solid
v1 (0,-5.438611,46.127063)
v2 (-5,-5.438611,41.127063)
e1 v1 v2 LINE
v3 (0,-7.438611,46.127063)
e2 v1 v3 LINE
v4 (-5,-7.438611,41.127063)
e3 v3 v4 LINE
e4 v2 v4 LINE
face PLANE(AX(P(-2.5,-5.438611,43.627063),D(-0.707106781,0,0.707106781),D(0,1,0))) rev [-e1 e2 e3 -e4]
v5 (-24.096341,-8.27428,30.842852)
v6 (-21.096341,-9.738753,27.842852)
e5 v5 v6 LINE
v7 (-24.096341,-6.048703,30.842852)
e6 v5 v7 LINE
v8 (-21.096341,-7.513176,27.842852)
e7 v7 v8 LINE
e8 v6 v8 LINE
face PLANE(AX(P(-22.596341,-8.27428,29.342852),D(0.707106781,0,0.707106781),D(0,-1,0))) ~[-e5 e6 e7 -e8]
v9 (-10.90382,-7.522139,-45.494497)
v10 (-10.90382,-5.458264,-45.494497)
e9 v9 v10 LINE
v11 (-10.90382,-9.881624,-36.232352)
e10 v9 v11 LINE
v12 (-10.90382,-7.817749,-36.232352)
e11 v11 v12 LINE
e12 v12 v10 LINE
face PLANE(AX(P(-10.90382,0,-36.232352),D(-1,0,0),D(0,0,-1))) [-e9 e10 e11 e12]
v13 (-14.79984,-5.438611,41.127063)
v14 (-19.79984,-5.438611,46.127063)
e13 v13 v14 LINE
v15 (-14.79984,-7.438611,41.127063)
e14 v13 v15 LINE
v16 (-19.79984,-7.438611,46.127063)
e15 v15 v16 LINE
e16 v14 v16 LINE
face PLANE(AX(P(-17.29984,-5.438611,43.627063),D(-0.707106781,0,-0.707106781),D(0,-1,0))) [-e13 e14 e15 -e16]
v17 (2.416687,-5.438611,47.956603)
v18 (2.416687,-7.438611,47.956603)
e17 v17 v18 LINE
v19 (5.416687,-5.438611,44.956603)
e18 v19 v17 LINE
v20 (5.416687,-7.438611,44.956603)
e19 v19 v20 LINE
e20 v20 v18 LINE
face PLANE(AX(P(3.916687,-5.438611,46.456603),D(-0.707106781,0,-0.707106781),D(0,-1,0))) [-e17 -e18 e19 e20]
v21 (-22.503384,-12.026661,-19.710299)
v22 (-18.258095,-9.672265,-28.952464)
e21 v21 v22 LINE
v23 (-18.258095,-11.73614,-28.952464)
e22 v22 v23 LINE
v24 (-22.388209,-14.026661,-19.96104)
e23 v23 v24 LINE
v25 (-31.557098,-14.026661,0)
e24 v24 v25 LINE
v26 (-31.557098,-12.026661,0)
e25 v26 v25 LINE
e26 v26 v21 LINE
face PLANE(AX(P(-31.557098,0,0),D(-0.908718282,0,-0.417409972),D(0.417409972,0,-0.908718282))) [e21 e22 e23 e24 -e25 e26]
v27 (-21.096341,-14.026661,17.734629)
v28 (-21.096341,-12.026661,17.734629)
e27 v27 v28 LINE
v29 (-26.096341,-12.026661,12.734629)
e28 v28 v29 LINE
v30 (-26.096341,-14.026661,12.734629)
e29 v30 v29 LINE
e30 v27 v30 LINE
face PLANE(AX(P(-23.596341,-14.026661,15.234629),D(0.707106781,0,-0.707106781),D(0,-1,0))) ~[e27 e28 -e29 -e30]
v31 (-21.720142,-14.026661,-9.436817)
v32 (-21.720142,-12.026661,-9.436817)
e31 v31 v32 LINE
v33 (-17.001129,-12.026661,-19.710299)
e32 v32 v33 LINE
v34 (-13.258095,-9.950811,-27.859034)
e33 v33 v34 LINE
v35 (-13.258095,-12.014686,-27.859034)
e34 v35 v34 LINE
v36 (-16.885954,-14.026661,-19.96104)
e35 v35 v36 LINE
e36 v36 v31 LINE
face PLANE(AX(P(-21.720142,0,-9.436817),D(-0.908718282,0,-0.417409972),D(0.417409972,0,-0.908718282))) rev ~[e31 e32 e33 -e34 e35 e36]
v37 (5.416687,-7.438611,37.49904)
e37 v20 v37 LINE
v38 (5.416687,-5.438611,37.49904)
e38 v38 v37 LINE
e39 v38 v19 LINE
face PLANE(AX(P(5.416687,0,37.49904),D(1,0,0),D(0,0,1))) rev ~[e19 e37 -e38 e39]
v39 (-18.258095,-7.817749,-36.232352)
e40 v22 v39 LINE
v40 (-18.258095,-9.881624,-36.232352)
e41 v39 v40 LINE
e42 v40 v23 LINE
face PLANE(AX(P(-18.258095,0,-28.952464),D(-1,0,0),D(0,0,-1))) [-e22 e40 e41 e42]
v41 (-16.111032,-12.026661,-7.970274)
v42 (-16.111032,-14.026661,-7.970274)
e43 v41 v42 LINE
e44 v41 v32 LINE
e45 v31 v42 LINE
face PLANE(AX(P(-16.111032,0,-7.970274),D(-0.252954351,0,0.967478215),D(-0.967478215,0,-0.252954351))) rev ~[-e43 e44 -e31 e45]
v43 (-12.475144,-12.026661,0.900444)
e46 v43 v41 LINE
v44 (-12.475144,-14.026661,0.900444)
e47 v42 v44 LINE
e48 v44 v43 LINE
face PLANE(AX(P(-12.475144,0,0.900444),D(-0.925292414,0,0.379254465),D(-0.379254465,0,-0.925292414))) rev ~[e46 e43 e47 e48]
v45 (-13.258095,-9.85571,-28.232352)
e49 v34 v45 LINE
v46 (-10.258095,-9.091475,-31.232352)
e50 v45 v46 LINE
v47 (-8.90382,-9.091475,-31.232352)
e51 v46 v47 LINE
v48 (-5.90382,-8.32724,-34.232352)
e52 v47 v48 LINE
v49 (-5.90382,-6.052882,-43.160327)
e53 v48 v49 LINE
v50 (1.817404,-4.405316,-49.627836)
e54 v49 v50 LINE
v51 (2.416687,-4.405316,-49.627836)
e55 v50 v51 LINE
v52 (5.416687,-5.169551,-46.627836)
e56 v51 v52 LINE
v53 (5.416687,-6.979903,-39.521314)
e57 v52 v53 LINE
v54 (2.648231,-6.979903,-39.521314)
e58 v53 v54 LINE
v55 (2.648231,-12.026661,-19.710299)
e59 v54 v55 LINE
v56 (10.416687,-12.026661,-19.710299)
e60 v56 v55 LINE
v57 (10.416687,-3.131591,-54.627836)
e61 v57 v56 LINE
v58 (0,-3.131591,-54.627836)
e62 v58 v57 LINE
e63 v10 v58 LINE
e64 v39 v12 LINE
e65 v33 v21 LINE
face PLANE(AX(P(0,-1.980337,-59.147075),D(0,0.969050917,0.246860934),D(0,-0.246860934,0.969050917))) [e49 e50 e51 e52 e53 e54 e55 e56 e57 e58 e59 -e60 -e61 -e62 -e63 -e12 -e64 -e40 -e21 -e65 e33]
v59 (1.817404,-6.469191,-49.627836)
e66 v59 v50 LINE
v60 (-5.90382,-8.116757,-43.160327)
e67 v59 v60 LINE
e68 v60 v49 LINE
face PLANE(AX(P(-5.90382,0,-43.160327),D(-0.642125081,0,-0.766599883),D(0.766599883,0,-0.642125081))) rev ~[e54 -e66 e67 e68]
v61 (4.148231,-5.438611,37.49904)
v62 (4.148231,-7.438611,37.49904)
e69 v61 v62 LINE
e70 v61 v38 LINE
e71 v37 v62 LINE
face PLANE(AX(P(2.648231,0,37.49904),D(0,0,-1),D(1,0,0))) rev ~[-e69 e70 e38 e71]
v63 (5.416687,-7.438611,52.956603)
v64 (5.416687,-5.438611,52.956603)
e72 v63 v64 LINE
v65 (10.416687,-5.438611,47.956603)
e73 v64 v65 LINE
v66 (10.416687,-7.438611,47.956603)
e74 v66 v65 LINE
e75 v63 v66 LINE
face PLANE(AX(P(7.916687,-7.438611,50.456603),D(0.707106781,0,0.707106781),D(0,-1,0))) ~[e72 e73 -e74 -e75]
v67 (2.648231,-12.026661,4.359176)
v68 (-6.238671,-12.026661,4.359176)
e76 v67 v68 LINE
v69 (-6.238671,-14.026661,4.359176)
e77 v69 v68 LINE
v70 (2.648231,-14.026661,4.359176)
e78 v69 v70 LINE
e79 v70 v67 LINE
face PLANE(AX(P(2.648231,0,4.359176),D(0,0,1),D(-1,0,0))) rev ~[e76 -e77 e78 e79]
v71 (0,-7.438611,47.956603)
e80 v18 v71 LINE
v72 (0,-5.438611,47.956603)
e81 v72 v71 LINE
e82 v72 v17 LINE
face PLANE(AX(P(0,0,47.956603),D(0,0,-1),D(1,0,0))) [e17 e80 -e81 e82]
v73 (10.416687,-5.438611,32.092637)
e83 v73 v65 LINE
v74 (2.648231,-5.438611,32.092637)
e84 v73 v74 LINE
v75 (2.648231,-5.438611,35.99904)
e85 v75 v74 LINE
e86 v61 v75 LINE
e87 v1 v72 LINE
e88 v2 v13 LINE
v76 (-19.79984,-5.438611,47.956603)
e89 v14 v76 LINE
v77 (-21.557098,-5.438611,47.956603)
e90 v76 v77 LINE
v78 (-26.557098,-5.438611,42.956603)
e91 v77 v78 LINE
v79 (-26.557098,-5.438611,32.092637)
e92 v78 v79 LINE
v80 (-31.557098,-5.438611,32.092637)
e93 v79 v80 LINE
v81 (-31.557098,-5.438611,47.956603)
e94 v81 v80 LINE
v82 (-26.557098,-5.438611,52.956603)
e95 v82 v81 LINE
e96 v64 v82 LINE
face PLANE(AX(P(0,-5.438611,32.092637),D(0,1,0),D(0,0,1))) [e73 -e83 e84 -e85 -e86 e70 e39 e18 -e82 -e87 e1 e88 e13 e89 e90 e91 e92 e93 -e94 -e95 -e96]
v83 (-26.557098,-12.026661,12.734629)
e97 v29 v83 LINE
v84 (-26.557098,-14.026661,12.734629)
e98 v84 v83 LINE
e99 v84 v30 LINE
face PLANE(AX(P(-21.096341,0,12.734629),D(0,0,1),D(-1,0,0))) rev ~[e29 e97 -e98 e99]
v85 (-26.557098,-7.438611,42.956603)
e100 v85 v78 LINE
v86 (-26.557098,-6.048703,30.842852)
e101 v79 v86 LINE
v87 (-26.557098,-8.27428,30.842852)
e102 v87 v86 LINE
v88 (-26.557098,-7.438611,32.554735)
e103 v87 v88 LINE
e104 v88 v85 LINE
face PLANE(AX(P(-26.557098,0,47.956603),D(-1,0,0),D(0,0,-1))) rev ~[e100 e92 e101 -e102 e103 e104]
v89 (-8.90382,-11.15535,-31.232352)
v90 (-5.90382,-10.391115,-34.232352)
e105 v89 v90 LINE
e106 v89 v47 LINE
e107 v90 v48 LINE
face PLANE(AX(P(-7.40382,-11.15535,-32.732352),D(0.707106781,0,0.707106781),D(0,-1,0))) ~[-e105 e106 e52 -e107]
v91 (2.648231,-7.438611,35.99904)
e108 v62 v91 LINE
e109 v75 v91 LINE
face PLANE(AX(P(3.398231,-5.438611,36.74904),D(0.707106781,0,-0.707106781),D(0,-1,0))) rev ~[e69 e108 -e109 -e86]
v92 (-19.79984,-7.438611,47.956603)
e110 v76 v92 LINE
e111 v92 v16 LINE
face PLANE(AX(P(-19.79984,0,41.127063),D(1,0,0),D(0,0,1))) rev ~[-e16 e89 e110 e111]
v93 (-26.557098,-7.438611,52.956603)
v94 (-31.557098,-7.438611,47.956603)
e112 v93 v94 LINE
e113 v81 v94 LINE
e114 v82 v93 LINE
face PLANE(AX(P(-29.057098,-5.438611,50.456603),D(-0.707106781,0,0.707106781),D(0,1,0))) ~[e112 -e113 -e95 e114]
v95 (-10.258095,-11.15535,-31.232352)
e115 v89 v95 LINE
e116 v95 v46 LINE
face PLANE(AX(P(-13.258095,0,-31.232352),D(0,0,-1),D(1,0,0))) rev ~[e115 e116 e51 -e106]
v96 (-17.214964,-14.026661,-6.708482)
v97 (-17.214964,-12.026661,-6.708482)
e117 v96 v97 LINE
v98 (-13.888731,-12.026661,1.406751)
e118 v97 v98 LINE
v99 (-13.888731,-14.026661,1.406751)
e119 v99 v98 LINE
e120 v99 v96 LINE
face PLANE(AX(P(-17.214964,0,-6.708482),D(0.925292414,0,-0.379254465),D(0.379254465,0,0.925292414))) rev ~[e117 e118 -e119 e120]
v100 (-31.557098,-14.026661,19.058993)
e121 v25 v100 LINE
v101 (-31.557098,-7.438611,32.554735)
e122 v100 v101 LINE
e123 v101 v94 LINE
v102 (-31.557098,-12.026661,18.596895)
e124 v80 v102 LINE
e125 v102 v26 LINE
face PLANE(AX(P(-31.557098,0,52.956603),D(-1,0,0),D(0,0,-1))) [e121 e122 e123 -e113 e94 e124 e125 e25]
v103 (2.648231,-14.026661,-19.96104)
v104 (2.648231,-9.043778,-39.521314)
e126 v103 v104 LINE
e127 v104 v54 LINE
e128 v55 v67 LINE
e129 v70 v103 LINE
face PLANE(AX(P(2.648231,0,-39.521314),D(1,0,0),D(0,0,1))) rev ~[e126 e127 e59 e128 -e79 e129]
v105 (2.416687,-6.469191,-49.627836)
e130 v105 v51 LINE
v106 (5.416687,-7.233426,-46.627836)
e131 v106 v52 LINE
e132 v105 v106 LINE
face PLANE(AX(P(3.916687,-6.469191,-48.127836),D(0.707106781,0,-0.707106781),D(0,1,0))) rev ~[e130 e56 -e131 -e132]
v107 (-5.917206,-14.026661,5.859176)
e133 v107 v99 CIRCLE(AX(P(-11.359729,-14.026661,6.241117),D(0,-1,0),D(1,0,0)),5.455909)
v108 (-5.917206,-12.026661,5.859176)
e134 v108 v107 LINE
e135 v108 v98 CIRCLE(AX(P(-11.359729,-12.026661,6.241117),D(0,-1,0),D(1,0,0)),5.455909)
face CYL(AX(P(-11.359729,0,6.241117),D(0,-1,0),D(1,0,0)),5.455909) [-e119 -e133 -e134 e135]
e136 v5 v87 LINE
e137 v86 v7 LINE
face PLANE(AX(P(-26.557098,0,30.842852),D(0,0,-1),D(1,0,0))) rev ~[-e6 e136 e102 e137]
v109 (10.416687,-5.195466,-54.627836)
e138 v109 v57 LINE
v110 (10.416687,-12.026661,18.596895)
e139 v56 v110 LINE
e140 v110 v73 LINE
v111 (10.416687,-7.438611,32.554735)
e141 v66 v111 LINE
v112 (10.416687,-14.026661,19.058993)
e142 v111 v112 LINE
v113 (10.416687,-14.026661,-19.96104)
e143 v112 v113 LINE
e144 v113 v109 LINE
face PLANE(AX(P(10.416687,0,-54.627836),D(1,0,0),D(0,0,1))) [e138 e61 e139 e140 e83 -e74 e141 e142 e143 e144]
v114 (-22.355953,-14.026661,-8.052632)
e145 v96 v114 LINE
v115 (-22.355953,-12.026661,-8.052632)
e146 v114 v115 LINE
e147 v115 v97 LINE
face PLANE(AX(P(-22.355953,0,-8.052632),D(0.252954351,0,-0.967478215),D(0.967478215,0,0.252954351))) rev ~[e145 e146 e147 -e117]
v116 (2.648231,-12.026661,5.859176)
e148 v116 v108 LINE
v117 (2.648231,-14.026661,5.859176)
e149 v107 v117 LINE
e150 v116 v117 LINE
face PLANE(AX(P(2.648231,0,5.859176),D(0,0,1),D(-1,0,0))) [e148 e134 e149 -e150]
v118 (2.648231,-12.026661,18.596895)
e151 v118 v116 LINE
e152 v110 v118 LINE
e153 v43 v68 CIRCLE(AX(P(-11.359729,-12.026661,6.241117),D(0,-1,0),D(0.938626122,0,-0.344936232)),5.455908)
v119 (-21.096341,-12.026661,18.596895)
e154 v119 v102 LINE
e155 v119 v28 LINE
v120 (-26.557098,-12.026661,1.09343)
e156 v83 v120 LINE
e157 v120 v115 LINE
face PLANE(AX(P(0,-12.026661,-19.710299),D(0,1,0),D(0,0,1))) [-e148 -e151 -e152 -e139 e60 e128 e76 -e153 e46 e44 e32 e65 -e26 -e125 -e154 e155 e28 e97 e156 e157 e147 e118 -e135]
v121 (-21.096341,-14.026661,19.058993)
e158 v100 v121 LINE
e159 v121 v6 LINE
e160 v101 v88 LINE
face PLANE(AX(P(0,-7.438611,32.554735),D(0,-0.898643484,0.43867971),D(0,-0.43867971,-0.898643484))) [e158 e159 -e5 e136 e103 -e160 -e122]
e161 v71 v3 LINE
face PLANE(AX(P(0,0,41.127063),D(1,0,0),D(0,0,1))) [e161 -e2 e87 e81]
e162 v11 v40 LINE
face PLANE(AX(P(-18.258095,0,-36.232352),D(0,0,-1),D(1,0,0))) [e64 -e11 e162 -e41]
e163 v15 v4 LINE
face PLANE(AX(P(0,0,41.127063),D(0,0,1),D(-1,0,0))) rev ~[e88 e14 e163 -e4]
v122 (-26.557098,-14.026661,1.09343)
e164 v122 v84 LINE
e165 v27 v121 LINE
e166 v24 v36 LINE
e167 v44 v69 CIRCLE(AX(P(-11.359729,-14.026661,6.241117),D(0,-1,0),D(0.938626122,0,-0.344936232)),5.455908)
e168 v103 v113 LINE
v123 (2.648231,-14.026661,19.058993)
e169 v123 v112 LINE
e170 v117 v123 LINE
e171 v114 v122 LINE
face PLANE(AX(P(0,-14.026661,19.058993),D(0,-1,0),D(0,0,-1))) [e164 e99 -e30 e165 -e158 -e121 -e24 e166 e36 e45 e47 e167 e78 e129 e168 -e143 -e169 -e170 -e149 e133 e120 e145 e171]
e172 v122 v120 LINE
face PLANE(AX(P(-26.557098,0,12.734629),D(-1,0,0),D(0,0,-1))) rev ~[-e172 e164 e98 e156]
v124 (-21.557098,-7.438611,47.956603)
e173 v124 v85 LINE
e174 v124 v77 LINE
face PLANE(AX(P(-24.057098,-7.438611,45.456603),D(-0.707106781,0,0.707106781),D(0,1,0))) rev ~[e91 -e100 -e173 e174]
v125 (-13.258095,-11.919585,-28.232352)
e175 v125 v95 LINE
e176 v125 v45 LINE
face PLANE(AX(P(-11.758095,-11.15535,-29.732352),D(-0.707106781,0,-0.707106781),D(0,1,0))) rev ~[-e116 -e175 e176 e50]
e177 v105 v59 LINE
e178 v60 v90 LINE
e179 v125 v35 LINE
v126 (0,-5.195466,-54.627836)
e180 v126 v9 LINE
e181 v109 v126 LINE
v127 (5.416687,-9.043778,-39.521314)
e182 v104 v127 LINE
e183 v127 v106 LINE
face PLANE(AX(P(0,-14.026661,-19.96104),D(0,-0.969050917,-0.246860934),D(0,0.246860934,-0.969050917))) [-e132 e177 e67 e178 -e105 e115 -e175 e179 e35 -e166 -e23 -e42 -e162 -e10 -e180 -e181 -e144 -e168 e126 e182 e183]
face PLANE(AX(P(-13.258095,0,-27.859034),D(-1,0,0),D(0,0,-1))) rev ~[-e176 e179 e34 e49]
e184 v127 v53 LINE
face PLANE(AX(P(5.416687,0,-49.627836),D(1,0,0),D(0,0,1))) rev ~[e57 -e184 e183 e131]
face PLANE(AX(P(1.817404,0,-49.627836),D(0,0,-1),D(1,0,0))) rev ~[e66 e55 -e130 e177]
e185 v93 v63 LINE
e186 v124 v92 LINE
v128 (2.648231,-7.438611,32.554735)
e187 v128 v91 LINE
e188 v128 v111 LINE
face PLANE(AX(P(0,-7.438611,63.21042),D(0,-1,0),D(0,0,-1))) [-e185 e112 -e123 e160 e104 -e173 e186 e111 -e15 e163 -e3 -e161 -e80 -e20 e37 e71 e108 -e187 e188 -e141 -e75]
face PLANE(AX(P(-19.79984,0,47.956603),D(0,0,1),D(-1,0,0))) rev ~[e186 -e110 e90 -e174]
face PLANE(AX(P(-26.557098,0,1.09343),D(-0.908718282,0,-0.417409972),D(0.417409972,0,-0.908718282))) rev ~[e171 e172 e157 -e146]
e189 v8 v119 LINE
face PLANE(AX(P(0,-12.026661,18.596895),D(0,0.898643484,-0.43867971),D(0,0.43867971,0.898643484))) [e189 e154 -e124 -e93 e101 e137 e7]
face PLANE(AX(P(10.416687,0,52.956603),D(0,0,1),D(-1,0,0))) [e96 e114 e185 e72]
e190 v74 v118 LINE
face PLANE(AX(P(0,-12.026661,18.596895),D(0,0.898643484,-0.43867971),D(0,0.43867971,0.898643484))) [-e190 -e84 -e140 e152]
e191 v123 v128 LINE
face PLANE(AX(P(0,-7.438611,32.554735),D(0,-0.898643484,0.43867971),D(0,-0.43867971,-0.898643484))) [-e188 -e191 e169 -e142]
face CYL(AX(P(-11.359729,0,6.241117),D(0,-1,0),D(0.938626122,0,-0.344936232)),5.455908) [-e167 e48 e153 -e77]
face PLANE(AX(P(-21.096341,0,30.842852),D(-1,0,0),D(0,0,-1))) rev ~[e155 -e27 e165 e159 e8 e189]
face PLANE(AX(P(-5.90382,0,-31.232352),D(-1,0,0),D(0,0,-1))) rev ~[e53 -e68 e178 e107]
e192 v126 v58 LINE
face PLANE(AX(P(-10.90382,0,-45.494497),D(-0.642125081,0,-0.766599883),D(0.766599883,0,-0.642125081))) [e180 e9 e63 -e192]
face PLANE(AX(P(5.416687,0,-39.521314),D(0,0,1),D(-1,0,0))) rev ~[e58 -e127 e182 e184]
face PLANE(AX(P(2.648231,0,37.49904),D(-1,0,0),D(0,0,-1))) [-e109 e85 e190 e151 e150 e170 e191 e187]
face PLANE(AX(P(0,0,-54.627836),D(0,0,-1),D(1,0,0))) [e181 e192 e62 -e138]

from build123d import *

# Parameters (mm, degrees)
F1_DEPTH = 25.4
F3_DEPTH = 30
F4_DEPTH = 30
F7_DEPTH = 25
F9_DEPTH = 40
F11_SIZE = 5
F12_SIZE = 3
F13_SIZE = 1.5


# Not quite as in the source:
# - a feature of the source that left no trace in its solid (it failed there, or was rolled back) is left out


with BuildPart() as f1:
    # F0 (on Front) → F1 (new body)
    with BuildSketch(Plane.XZ):
        Polygon((10.4166865349, 52.9566034675), (-31.557098031, 52.9566034675), (-31.557098031, 0), (-18.2580947876, -28.9524644613), (-18.2580947876, -36.2323522568), (-10.9038203955, -36.2323522568), (-10.9038203955, -45.4944968224), (0, -54.6278357506), (10.4166865349, -54.6278357506), align=None)
    extrude(amount=F1_DEPTH)


with BuildPart() as f3:
    # F2 (on Front) → F3 (new body, symmetric)
    with BuildSketch(Plane.XZ):
        with BuildLine():
            Line((-19.7998397052, 47.9566034675), (-26.557098031, 47.9566034675))
            Line((-26.557098031, 47.9566034675), (-26.557098031, 30.8428518474))
            Line((-26.557098031, 30.8428518474), (-21.0963413119, 30.8428518474))
            Line((-21.0963413119, 30.8428518474), (-21.0963413119, 12.7346292138))
            Line((-21.0963413119, 12.7346292138), (-26.557098031, 12.7346292138))
            Line((-26.557098031, 12.7346292138), (-26.557098031, 1.0934300149))
            Line((-26.557098031, 1.0934300149), (-22.3559527725, -8.0526320297))
            Line((-22.3559527725, -8.0526320297), (-17.2149640966, -6.7084824335))
            Line((-17.2149640966, -6.7084824335), (-13.8887305603, 1.4067513807))
            ThreePointArc((-13.8887305603, 1.4067513807), (-14.1854089296, 10.908286), (-5.9038203955, 6.2411166728))
            ThreePointArc((-5.9038203955, 6.2411166728), (-5.9071677422, 6.0500291804), (-5.9172056749, 5.8591761626))
            Line((-5.9172056749, 5.8591761626), (2.6482306421, 5.8591761626))
            Line((2.6482306421, 5.8591761626), (2.6482306421, 37.4990403652))
            Line((2.6482306421, 37.4990403652), (5.4166865349, 37.4990403652))
            Line((5.4166865349, 37.4990403652), (5.4166865349, 47.9566034675))
            Line((5.4166865349, 47.9566034675), (0, 47.9566034675))
            Line((0, 47.9566034675), (0, 41.127063334))
            Line((0, 41.127063334), (-19.7998397052, 41.127063334))
            Line((-19.7998397052, 41.127063334), (-19.7998397052, 47.9566034675))
        make_face()
    extrude(amount=F3_DEPTH, both=True)


with BuildPart() as f4:
    # F2 (on Front) → F4 (new body, symmetric)
    with BuildSketch(Plane.XZ):
        with BuildLine():
            Line((-16.1110319639, -7.9702737021), (-21.7201422185, -9.4368171549))
            Line((-21.7201422185, -9.4368171549), (-13.2580947876, -27.8590344464))
            Line((-13.2580947876, -27.8590344464), (-13.2580947876, -31.2323522568))
            Line((-13.2580947876, -31.2323522568), (-5.9038203955, -31.2323522568))
            Line((-5.9038203955, -31.2323522568), (-5.9038203955, -43.1603266307))
            Line((-5.9038203955, -43.1603266307), (1.8174038362, -49.6278357506))
            Line((1.8174038362, -49.6278357506), (5.4166865349, -49.6278357506))
            Line((5.4166865349, -49.6278357506), (5.4166865349, -39.5213142037))
            Line((5.4166865349, -39.5213142037), (2.6482306421, -39.5213142037))
            Line((2.6482306421, -39.5213142037), (2.6482306421, 4.3591761626))
            Line((2.6482306421, 4.3591761626), (-6.238670659, 4.3591761626))
            ThreePointArc((-6.238670659, 4.3591761626), (-8.7135994884, 1.4698551421), (-12.4751443179, 0.900443897))
            Line((-12.4751443179, 0.900443897), (-16.1110319639, -7.9702737021))
        make_face()
    extrude(amount=F4_DEPTH, both=True)


with BuildPart() as f1_1:
    add(f1.part)

    # F5: cut F3
    add(f3.part, mode=Mode.SUBTRACT)

    # F6: cut F4
    add(f4.part, mode=Mode.SUBTRACT)

    # F7 (add): a face of the model
    f7_faces = [f1_1.faces().sort_by_distance(p)[0] for p in [
        (-7.5880887423, 0, 6.6814576026),
    ]]
    extrude(f7_faces, amount=F7_DEPTH)


with BuildPart() as f9:
    # F8 (on Right) → F9 (new body, symmetric)
    with BuildSketch(Plane.YZ):
        Polygon((-5.4386107326, 32.0926371886), (-5.4386107326, 63.2104203105), (-7.4386107326, 63.2104203105), (-7.4386107326, 32.5547352223), (-14.0266608968, 19.0589928517), (-14.0266608968, -19.9610399589), (-3.9184388004, -59.6407970668), (-1.9803369667, -59.1470751993), (-12.0266608968, -19.7102989226), (-12.0266608968, 18.596894818), align=None)
    extrude(amount=F9_DEPTH, both=True)


with BuildPart() as f1_2:
    add(f1_1.part)

    # F10: intersect F9
    add(f9.part, mode=Mode.INTERSECT)

    # F11
    f11_edges = [f1_2.edges().sort_by_distance(p)[0] for p in [
        (-26.557098, -6.438611, 47.956603),
        (10.416687, -6.438611, 52.956603),
        (-31.557098, -6.438611, 52.956603),
        (0, -6.438611, 41.127063),
        (-19.79984, -6.438611, 41.127063),
        (-21.096341, -13.026661, 12.734629),
    ]]
    chamfer(f11_edges, length=F11_SIZE)

    # F12
    f12_edges = [f1_2.edges().sort_by_distance(p)[0] for p in [
        (5.416687, -6.438611, 47.956603),
        (-21.096341, -7.161491, 30.842852),
        (5.416687, -5.437254, -49.627836),
        (-5.90382, -10.123412, -31.232352),
        (-13.258095, -10.123412, -31.232352),
    ]]
    chamfer(f12_edges, length=F12_SIZE)

    # F13
    f13_edges = [f1_2.edges().sort_by_distance(p)[0] for p in [
        (2.648231, -6.438611, 37.49904),
    ]]
    chamfer(f13_edges, length=F13_SIZE)


solid = f1_2.part
